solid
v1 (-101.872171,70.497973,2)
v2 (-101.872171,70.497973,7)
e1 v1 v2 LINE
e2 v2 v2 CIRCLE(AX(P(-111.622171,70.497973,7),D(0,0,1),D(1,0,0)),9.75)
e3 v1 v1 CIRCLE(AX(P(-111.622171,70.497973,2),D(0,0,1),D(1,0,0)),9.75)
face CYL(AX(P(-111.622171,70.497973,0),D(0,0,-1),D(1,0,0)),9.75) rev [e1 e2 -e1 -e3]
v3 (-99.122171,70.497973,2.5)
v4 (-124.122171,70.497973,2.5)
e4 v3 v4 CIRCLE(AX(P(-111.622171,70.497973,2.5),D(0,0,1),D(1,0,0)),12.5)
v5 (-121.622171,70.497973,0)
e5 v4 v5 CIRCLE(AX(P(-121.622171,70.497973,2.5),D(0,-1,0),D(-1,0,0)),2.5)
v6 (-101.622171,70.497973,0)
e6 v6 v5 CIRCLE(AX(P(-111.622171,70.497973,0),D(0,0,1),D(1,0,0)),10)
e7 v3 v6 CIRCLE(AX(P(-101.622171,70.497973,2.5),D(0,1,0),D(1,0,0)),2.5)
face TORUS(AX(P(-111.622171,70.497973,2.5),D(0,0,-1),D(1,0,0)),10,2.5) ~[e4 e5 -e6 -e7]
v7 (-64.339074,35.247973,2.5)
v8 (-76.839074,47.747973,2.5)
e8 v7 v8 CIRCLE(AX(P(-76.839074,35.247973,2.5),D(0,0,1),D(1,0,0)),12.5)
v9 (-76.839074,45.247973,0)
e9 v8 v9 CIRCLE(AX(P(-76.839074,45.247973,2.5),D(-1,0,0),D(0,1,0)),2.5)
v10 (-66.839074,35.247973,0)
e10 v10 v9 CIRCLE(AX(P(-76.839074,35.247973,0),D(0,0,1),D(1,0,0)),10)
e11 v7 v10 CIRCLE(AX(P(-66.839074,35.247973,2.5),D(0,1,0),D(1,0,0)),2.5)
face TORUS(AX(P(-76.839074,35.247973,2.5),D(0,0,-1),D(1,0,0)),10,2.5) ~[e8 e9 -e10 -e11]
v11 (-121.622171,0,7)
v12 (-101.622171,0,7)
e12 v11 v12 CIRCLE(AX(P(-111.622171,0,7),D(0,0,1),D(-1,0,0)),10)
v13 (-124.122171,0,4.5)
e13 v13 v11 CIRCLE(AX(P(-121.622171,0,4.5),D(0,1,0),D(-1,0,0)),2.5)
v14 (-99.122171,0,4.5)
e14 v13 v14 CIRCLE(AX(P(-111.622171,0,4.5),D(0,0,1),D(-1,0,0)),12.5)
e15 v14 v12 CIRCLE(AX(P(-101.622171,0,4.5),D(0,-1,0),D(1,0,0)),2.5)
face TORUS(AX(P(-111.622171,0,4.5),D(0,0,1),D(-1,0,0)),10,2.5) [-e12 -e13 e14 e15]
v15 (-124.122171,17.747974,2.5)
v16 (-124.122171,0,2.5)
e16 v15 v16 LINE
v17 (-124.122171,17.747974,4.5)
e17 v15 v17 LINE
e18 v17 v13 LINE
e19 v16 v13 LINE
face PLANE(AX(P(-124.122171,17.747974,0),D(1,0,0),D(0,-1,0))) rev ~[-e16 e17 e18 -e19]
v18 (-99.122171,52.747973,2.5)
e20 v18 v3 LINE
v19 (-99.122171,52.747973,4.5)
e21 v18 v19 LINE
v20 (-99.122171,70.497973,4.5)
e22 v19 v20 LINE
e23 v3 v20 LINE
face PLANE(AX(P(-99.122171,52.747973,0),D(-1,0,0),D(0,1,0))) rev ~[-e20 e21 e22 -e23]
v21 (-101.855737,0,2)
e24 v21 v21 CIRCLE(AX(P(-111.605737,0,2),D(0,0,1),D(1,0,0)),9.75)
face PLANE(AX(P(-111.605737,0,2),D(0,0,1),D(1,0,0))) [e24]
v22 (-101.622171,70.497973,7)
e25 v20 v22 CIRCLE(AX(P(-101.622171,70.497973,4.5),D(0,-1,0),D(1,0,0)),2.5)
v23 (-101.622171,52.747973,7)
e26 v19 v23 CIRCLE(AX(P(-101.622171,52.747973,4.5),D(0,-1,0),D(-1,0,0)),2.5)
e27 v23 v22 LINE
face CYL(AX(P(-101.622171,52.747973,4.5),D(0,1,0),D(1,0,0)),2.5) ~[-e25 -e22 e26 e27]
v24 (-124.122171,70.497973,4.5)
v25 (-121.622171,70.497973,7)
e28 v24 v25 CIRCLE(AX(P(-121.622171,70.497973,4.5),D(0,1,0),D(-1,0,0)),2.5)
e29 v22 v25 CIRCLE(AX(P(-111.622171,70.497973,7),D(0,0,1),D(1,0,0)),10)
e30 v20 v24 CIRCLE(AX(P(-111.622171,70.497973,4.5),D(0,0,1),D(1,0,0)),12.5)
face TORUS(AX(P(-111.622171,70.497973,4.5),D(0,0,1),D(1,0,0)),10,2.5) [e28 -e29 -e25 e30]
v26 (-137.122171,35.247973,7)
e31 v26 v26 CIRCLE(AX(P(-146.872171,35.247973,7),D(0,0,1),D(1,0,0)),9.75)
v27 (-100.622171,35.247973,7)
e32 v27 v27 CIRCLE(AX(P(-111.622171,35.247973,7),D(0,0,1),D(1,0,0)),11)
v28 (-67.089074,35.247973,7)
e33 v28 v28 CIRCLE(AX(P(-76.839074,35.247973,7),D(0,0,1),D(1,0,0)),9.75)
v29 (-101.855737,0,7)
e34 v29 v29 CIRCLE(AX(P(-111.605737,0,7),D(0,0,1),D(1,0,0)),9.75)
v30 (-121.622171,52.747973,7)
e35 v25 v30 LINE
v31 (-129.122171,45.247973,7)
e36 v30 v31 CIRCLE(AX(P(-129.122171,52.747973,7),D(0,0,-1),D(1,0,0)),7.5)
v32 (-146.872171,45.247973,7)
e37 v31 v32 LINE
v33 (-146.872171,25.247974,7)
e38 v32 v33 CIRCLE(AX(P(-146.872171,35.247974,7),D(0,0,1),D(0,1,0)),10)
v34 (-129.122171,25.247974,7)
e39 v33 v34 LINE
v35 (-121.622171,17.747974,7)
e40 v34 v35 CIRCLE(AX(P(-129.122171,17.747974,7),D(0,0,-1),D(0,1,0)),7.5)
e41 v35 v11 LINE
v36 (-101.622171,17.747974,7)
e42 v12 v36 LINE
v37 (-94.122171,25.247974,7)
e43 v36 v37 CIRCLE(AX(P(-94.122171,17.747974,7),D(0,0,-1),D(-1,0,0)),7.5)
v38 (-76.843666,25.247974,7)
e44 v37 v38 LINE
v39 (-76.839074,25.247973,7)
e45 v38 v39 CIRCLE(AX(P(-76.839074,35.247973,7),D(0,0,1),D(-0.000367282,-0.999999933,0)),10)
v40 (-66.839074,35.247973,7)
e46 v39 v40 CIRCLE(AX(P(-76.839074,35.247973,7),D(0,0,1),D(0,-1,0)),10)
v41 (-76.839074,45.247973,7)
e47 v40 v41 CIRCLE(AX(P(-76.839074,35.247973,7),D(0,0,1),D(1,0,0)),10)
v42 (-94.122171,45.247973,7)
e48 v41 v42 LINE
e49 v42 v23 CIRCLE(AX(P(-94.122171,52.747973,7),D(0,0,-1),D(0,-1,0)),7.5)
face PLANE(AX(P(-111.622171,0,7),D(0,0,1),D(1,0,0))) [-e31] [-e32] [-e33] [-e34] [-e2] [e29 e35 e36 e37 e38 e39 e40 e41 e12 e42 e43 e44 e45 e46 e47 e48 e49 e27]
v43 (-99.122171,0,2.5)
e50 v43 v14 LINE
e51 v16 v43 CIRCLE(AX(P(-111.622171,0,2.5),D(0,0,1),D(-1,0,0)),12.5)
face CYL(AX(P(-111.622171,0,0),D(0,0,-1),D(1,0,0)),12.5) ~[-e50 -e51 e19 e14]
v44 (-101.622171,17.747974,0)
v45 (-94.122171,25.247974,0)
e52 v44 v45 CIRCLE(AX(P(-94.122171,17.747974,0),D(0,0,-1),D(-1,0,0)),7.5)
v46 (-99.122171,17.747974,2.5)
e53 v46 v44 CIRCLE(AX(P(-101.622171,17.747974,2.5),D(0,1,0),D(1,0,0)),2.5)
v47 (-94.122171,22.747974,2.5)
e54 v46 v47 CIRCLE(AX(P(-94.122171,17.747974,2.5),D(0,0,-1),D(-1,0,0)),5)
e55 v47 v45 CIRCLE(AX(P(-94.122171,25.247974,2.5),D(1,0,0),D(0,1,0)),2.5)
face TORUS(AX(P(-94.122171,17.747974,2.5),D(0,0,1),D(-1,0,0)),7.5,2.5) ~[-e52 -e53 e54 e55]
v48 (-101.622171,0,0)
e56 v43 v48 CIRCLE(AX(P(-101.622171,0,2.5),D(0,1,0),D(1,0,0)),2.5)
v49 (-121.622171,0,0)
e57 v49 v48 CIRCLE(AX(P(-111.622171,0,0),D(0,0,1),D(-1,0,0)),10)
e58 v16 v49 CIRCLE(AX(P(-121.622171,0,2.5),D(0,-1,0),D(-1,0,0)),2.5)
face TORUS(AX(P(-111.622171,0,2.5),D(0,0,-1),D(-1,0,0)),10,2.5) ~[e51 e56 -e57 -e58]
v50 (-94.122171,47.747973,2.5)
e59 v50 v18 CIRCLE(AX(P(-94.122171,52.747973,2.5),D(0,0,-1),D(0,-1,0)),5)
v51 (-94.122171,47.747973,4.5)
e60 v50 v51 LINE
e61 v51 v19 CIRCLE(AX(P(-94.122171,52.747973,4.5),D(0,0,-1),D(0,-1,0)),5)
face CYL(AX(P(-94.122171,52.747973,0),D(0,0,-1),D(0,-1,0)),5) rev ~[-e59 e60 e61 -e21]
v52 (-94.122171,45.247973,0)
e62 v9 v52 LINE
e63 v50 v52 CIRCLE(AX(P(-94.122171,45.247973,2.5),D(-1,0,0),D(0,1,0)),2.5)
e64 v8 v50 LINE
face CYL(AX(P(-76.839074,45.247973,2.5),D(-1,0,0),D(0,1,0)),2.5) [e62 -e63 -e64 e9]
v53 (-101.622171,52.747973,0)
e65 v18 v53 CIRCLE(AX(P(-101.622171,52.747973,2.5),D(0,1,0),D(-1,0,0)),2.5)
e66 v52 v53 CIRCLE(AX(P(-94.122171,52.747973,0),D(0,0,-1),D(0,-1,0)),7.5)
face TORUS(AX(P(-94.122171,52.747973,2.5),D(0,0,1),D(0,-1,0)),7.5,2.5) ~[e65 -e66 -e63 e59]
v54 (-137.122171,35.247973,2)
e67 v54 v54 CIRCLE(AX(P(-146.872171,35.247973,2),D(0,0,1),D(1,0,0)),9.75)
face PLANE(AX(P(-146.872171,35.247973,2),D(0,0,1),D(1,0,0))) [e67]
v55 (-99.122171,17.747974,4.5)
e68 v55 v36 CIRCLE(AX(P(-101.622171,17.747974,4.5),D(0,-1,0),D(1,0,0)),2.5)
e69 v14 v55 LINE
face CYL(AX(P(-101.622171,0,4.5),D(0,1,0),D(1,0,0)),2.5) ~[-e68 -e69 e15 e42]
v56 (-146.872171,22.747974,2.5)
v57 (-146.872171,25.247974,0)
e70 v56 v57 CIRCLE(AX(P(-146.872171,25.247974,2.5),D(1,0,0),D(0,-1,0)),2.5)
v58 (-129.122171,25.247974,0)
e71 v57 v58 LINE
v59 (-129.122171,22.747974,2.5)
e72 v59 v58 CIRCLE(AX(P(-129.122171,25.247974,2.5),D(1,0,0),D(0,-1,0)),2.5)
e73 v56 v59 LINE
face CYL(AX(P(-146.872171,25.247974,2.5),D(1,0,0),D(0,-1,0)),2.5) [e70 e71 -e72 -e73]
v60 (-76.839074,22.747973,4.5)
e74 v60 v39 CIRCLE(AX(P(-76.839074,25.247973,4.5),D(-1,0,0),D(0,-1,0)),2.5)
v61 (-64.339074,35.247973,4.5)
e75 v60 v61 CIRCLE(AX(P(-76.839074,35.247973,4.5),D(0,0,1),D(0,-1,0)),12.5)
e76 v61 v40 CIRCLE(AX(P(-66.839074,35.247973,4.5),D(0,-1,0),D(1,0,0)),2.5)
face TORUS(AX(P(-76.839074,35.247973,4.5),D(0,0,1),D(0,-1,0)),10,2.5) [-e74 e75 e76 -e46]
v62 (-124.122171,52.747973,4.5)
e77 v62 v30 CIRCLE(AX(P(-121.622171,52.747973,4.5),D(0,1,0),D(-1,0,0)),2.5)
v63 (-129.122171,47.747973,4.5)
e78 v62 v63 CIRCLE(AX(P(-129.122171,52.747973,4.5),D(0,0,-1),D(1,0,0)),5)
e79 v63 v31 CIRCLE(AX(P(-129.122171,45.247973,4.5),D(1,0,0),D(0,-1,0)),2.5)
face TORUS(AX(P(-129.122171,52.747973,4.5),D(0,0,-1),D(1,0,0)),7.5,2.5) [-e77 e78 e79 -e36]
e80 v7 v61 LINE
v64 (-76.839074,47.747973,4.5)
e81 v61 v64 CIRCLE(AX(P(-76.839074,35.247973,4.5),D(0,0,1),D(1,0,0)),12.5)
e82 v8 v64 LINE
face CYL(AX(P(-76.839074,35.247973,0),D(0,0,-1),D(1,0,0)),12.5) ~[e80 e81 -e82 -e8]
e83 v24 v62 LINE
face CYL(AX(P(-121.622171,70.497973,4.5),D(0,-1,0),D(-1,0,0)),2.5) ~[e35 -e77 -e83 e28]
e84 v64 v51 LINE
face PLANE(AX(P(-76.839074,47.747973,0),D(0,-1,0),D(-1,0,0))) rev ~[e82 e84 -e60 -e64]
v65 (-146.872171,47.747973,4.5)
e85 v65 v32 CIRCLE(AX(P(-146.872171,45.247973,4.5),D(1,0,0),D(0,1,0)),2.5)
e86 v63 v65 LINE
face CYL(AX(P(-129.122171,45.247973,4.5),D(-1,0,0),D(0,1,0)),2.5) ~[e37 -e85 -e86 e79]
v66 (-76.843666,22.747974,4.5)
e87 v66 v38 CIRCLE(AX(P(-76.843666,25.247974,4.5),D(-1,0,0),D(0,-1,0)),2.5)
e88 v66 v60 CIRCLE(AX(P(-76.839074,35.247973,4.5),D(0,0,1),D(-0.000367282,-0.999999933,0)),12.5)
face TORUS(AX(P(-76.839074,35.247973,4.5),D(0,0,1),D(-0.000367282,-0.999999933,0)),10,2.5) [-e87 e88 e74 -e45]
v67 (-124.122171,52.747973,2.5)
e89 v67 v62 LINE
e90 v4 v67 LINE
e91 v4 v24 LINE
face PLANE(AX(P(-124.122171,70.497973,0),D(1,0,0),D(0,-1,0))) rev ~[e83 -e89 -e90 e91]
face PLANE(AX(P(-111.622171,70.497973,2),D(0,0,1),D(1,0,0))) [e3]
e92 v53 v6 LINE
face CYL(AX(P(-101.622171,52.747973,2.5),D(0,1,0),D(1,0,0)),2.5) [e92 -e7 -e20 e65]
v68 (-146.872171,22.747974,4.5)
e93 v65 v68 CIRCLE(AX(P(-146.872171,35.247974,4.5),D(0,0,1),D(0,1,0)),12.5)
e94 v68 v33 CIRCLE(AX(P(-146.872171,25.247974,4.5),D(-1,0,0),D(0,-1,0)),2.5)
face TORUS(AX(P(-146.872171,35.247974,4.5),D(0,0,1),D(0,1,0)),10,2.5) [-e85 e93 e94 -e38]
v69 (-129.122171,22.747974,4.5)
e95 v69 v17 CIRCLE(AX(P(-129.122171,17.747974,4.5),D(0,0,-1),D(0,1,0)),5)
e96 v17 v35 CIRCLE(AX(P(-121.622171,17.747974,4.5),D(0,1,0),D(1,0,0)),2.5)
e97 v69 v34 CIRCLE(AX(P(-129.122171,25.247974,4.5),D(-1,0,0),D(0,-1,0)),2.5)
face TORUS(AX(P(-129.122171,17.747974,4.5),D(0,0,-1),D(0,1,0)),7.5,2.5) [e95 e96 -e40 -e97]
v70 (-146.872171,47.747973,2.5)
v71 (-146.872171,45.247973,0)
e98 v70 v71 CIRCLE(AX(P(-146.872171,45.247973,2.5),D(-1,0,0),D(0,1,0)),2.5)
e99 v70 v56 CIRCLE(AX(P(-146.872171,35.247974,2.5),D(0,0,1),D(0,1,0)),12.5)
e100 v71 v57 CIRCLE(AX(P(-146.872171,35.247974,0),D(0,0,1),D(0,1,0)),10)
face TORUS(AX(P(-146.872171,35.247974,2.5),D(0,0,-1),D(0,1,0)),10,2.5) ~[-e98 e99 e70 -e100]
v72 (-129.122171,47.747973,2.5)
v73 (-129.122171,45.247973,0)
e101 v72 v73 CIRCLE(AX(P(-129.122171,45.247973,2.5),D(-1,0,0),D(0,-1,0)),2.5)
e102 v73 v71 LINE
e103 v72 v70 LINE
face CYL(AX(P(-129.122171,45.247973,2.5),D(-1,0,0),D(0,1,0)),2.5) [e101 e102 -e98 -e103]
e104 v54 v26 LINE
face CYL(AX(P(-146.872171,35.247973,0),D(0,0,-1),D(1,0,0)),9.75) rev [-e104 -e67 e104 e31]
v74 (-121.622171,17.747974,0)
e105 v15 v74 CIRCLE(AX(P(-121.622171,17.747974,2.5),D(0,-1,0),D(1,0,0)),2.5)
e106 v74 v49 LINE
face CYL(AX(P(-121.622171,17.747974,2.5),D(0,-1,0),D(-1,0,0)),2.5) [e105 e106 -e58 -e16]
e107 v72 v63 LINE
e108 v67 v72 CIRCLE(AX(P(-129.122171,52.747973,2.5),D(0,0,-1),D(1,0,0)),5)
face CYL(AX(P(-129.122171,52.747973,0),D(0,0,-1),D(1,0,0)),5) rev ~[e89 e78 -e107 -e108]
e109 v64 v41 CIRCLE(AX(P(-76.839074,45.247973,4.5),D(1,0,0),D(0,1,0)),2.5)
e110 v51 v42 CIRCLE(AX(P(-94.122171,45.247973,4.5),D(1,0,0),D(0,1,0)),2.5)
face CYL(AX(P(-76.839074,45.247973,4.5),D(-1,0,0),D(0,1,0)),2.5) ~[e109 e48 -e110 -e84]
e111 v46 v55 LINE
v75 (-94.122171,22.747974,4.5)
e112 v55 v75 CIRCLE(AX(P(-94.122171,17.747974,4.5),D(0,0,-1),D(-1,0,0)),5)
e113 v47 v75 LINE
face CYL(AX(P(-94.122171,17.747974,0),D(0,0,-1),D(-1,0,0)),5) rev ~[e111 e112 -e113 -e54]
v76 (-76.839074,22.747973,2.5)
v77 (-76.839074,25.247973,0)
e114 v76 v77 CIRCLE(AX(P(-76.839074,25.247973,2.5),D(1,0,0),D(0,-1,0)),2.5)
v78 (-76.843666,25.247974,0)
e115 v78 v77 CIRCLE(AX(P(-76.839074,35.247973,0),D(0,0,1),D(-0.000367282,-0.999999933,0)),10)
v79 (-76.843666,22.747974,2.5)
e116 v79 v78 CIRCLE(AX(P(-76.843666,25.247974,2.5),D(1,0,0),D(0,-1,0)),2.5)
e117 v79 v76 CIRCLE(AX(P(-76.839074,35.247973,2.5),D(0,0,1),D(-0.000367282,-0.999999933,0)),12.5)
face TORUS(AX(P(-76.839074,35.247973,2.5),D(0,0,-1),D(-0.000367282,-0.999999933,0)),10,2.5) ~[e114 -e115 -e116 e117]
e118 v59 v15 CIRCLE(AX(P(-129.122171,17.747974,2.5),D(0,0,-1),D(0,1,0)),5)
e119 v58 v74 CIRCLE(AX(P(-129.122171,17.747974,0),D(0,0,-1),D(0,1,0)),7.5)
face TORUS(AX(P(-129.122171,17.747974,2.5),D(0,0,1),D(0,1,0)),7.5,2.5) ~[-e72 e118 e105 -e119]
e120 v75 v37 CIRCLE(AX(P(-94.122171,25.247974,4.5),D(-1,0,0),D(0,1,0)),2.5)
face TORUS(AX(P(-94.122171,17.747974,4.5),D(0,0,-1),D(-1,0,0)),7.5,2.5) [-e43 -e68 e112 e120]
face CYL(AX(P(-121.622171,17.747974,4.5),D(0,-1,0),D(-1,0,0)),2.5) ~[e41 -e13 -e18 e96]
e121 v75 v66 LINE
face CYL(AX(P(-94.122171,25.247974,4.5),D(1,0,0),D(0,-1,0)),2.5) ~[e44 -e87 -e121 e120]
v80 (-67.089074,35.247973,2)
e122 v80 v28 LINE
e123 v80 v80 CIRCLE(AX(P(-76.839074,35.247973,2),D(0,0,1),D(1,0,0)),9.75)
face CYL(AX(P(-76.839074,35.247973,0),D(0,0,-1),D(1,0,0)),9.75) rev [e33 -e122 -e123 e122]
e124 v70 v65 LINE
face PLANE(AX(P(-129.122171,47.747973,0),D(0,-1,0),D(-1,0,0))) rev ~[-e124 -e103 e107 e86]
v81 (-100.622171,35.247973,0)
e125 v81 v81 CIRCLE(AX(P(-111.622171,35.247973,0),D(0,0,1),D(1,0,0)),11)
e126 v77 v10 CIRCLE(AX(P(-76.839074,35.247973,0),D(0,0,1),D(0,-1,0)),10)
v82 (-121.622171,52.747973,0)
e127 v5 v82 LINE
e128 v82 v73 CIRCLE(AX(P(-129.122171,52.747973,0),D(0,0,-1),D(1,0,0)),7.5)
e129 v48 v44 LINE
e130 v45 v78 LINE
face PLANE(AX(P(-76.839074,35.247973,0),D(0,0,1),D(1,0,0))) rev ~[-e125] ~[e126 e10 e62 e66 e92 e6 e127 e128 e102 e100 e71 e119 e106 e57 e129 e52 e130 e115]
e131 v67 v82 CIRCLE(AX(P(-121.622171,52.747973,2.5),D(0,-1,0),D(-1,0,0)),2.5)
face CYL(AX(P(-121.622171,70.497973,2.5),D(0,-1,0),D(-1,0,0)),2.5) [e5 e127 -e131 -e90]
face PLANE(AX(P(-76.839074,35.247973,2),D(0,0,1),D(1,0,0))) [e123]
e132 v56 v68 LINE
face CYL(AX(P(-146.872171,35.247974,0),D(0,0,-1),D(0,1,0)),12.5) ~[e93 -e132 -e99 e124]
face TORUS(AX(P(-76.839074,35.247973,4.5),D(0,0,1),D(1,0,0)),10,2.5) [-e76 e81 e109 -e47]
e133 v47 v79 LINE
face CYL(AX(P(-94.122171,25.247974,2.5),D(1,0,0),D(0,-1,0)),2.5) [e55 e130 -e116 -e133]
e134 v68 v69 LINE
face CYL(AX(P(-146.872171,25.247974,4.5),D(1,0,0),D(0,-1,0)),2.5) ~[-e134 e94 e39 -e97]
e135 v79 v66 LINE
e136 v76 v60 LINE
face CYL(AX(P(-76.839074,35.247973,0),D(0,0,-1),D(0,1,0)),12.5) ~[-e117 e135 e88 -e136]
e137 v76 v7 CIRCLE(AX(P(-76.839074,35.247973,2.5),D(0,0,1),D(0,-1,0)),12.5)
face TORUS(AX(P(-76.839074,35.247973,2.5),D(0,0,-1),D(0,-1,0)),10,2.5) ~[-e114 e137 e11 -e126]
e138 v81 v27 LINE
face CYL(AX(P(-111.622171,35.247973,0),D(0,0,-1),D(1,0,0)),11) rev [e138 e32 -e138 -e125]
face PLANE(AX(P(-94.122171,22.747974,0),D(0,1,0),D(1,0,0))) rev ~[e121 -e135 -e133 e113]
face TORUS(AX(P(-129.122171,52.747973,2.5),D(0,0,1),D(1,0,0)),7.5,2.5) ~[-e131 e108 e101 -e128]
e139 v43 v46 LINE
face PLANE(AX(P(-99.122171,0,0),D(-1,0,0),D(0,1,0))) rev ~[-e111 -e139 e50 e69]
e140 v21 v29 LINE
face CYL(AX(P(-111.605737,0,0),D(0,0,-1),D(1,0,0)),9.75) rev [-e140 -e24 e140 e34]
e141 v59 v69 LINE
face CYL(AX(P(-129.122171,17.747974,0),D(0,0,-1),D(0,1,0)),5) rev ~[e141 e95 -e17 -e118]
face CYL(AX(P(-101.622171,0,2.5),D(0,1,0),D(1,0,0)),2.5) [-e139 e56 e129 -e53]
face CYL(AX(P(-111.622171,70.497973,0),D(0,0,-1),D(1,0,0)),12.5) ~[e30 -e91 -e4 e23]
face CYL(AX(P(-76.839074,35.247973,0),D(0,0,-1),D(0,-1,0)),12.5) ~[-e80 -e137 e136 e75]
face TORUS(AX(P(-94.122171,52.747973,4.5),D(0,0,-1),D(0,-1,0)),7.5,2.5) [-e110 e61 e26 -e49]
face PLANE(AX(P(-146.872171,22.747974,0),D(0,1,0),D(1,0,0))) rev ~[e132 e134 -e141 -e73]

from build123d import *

# Parameters (mm, degrees)
F0_R     = 9.75
F0_R_2   = 11
F1_DEPTH = 7
F2_R     = 2.5
F3_DEPTH = 2


# Not quite as in the source:
# - ends of sketch curves that miss each other by under 0.0002 mm in the source are joined


with BuildPart() as f1:
    # F0 (on Top) → F1 (new body)
    with BuildSketch(Plane.XY):
        with BuildLine():
            ThreePointArc((-124.122170751, 0), (-111.622170751, -12.5), (-99.122170751, 0))
            ThreePointArc((-99.122170751, 0), (-111.622170751, 12.5), (-124.122170751, 0))
        make_face()
        with Locations((-111.6057372503, 0)):
            Circle(F0_R, mode=Mode.SUBTRACT)
        with BuildLine():
            ThreePointArc((-124.122170751, 70.4979732546), (-111.622170751, 57.9979732546), (-99.122170751, 70.4979732546))
            ThreePointArc((-99.122170751, 70.4979732546), (-111.622170751, 82.9979732546), (-124.122170751, 70.4979732546))
        make_face()
        with Locations((-111.622170751, 70.4979732546)):
            Circle(F0_R, mode=Mode.SUBTRACT)
        with BuildLine():
            ThreePointArc((-64.3390744925, 35.2479732546), (-68.0002397276, 44.0868080194), (-76.8390744925, 47.7479732546))
            ThreePointArc((-76.8390744925, 47.7479732546), (-89.3390744925, 35.2479732546), (-76.8390744925, 22.7479732546))
            ThreePointArc((-76.8390744925, 22.7479732546), (-68.0002397276, 26.4091384898), (-64.3390744925, 35.2479732546))
        make_face()
        with Locations((-76.8390744925, 35.2479732546)):
            Circle(F0_R, mode=Mode.SUBTRACT)
        with BuildLine():
            Line((-99.122170751, 52.7479732546), (-99.122170751, 70.4979732546))
            ThreePointArc((-99.122170751, 70.4979732546), (-111.622170751, 57.9979732546), (-124.122170751, 70.4979732546))
            Line((-124.122170751, 70.4979732546), (-124.122170751, 52.7479732546))
            ThreePointArc((-124.122170751, 52.7479732546), (-125.5866368451, 49.2124393487), (-129.122170751, 47.7479732546))
            Line((-129.122170751, 47.7479732546), (-146.872170751, 47.7479732546))
            ThreePointArc((-146.872170751, 47.7479732546), (-138.0333359862, 44.0868088626), (-134.372170751, 35.2479740977))
            ThreePointArc((-134.372170751, 35.2479740977), (-138.0333359862, 26.4091393329), (-146.872170751, 22.7479740977))
            Line((-146.872170751, 22.7479740977), (-129.122170751, 22.7479740977))
            ThreePointArc((-129.122170751, 22.7479740977), (-125.5866368451, 21.2835080037), (-124.122170751, 17.7479740977))
            Line((-124.122170751, 17.7479740977), (-124.122170751, 0))
            ThreePointArc((-124.122170751, 0), (-111.622170751, 12.5), (-99.122170751, 0))
            Line((-99.122170751, 0), (-99.122170751, 17.7479740977))
            ThreePointArc((-99.122170751, 17.7479740977), (-97.6577046569, 21.2835080037), (-94.122170751, 22.7479740977))
            Line((-94.122170751, 22.7479740977), (-76.8390744925, 22.7479740977))
            ThreePointArc((-76.8390744925, 22.7479740977), (-89.3390744925, 35.2479732546), (-76.8390744925, 47.7479732546))
            Line((-76.8390744925, 47.7479732546), (-94.122170751, 47.7479732546))
            ThreePointArc((-94.122170751, 47.7479732546), (-97.6577046569, 49.2124393487), (-99.122170751, 52.7479732546))
        make_face()
        with Locations((-111.622170751, 35.2479732546)):
            Circle(F0_R_2, mode=Mode.SUBTRACT)
        with BuildLine():
            ThreePointArc((-134.372170751, 35.2479740977), (-138.0333359862, 44.0868088626), (-146.872170751, 47.7479740977))
            ThreePointArc((-146.872170751, 47.7479740977), (-159.372170751, 35.2479740977), (-146.872170751, 22.7479740977))
            ThreePointArc((-146.872170751, 22.7479740977), (-138.0333359862, 26.4091393329), (-134.372170751, 35.2479740977))
        make_face()
        with Locations((-146.872170751, 35.2479732546)):
            Circle(F0_R, mode=Mode.SUBTRACT)
    extrude(amount=F1_DEPTH)

    # F2
    f2_edges = [f1.edges().sort_by_distance(p)[0] for p in [
        (-124.122171, 61.622973, 7),
        (-125.586637, 49.212439, 7),
        (-137.997171, 22.747974, 0),
        (-125.586637, 21.283508, 0),
        (-124.122171, 8.873987, 0),
        (-111.622171, -12.5, 7),
        (-99.122171, 8.873987, 0),
        (-111.622171, -12.5, 0),
        (-111.622171, 82.997973, 7),
        (-99.122171, 61.622973, 7),
        (-97.657705, 49.212439, 7),
        (-85.480623, 47.747973, 7),
        (-64.339074, 35.247973, 7),
        (-85.480623, 22.747974, 7),
        (-97.657705, 21.283508, 7),
        (-99.122171, 8.873987, 7),
        (-159.372171, 35.247974, 7),
        (-137.997171, 47.747973, 7),
        (-124.122171, 8.873987, 7),
        (-125.586637, 21.283508, 7),
        (-137.997171, 22.747974, 7),
        (-97.657705, 21.283508, 0),
        (-85.480623, 22.747974, 0),
        (-64.339074, 35.247973, 0),
        (-85.480623, 47.747973, 0),
        (-111.622171, 82.997973, 0),
        (-97.657705, 49.212439, 0),
        (-99.122171, 61.622973, 0),
        (-124.122171, 61.622973, 0),
        (-125.586637, 49.212439, 0),
        (-137.997171, 47.747973, 0),
        (-159.372171, 35.247974, 0),
    ]]
    fillet(f2_edges, radius=F2_R)

    # F0 (on Top) → F3 (join)
    with BuildSketch(Plane.XY):
        with Locations((-76.8390744925, 35.2479732546)):
            Circle(F0_R)
        with Locations((-111.622170751, 70.4979732546)):
            Circle(F0_R)
        with Locations((-146.872170751, 35.2479732546)):
            Circle(F0_R)
        with Locations((-111.6057372503, 0)):
            Circle(F0_R)
    extrude(amount=F3_DEPTH)


solid = f1.part
